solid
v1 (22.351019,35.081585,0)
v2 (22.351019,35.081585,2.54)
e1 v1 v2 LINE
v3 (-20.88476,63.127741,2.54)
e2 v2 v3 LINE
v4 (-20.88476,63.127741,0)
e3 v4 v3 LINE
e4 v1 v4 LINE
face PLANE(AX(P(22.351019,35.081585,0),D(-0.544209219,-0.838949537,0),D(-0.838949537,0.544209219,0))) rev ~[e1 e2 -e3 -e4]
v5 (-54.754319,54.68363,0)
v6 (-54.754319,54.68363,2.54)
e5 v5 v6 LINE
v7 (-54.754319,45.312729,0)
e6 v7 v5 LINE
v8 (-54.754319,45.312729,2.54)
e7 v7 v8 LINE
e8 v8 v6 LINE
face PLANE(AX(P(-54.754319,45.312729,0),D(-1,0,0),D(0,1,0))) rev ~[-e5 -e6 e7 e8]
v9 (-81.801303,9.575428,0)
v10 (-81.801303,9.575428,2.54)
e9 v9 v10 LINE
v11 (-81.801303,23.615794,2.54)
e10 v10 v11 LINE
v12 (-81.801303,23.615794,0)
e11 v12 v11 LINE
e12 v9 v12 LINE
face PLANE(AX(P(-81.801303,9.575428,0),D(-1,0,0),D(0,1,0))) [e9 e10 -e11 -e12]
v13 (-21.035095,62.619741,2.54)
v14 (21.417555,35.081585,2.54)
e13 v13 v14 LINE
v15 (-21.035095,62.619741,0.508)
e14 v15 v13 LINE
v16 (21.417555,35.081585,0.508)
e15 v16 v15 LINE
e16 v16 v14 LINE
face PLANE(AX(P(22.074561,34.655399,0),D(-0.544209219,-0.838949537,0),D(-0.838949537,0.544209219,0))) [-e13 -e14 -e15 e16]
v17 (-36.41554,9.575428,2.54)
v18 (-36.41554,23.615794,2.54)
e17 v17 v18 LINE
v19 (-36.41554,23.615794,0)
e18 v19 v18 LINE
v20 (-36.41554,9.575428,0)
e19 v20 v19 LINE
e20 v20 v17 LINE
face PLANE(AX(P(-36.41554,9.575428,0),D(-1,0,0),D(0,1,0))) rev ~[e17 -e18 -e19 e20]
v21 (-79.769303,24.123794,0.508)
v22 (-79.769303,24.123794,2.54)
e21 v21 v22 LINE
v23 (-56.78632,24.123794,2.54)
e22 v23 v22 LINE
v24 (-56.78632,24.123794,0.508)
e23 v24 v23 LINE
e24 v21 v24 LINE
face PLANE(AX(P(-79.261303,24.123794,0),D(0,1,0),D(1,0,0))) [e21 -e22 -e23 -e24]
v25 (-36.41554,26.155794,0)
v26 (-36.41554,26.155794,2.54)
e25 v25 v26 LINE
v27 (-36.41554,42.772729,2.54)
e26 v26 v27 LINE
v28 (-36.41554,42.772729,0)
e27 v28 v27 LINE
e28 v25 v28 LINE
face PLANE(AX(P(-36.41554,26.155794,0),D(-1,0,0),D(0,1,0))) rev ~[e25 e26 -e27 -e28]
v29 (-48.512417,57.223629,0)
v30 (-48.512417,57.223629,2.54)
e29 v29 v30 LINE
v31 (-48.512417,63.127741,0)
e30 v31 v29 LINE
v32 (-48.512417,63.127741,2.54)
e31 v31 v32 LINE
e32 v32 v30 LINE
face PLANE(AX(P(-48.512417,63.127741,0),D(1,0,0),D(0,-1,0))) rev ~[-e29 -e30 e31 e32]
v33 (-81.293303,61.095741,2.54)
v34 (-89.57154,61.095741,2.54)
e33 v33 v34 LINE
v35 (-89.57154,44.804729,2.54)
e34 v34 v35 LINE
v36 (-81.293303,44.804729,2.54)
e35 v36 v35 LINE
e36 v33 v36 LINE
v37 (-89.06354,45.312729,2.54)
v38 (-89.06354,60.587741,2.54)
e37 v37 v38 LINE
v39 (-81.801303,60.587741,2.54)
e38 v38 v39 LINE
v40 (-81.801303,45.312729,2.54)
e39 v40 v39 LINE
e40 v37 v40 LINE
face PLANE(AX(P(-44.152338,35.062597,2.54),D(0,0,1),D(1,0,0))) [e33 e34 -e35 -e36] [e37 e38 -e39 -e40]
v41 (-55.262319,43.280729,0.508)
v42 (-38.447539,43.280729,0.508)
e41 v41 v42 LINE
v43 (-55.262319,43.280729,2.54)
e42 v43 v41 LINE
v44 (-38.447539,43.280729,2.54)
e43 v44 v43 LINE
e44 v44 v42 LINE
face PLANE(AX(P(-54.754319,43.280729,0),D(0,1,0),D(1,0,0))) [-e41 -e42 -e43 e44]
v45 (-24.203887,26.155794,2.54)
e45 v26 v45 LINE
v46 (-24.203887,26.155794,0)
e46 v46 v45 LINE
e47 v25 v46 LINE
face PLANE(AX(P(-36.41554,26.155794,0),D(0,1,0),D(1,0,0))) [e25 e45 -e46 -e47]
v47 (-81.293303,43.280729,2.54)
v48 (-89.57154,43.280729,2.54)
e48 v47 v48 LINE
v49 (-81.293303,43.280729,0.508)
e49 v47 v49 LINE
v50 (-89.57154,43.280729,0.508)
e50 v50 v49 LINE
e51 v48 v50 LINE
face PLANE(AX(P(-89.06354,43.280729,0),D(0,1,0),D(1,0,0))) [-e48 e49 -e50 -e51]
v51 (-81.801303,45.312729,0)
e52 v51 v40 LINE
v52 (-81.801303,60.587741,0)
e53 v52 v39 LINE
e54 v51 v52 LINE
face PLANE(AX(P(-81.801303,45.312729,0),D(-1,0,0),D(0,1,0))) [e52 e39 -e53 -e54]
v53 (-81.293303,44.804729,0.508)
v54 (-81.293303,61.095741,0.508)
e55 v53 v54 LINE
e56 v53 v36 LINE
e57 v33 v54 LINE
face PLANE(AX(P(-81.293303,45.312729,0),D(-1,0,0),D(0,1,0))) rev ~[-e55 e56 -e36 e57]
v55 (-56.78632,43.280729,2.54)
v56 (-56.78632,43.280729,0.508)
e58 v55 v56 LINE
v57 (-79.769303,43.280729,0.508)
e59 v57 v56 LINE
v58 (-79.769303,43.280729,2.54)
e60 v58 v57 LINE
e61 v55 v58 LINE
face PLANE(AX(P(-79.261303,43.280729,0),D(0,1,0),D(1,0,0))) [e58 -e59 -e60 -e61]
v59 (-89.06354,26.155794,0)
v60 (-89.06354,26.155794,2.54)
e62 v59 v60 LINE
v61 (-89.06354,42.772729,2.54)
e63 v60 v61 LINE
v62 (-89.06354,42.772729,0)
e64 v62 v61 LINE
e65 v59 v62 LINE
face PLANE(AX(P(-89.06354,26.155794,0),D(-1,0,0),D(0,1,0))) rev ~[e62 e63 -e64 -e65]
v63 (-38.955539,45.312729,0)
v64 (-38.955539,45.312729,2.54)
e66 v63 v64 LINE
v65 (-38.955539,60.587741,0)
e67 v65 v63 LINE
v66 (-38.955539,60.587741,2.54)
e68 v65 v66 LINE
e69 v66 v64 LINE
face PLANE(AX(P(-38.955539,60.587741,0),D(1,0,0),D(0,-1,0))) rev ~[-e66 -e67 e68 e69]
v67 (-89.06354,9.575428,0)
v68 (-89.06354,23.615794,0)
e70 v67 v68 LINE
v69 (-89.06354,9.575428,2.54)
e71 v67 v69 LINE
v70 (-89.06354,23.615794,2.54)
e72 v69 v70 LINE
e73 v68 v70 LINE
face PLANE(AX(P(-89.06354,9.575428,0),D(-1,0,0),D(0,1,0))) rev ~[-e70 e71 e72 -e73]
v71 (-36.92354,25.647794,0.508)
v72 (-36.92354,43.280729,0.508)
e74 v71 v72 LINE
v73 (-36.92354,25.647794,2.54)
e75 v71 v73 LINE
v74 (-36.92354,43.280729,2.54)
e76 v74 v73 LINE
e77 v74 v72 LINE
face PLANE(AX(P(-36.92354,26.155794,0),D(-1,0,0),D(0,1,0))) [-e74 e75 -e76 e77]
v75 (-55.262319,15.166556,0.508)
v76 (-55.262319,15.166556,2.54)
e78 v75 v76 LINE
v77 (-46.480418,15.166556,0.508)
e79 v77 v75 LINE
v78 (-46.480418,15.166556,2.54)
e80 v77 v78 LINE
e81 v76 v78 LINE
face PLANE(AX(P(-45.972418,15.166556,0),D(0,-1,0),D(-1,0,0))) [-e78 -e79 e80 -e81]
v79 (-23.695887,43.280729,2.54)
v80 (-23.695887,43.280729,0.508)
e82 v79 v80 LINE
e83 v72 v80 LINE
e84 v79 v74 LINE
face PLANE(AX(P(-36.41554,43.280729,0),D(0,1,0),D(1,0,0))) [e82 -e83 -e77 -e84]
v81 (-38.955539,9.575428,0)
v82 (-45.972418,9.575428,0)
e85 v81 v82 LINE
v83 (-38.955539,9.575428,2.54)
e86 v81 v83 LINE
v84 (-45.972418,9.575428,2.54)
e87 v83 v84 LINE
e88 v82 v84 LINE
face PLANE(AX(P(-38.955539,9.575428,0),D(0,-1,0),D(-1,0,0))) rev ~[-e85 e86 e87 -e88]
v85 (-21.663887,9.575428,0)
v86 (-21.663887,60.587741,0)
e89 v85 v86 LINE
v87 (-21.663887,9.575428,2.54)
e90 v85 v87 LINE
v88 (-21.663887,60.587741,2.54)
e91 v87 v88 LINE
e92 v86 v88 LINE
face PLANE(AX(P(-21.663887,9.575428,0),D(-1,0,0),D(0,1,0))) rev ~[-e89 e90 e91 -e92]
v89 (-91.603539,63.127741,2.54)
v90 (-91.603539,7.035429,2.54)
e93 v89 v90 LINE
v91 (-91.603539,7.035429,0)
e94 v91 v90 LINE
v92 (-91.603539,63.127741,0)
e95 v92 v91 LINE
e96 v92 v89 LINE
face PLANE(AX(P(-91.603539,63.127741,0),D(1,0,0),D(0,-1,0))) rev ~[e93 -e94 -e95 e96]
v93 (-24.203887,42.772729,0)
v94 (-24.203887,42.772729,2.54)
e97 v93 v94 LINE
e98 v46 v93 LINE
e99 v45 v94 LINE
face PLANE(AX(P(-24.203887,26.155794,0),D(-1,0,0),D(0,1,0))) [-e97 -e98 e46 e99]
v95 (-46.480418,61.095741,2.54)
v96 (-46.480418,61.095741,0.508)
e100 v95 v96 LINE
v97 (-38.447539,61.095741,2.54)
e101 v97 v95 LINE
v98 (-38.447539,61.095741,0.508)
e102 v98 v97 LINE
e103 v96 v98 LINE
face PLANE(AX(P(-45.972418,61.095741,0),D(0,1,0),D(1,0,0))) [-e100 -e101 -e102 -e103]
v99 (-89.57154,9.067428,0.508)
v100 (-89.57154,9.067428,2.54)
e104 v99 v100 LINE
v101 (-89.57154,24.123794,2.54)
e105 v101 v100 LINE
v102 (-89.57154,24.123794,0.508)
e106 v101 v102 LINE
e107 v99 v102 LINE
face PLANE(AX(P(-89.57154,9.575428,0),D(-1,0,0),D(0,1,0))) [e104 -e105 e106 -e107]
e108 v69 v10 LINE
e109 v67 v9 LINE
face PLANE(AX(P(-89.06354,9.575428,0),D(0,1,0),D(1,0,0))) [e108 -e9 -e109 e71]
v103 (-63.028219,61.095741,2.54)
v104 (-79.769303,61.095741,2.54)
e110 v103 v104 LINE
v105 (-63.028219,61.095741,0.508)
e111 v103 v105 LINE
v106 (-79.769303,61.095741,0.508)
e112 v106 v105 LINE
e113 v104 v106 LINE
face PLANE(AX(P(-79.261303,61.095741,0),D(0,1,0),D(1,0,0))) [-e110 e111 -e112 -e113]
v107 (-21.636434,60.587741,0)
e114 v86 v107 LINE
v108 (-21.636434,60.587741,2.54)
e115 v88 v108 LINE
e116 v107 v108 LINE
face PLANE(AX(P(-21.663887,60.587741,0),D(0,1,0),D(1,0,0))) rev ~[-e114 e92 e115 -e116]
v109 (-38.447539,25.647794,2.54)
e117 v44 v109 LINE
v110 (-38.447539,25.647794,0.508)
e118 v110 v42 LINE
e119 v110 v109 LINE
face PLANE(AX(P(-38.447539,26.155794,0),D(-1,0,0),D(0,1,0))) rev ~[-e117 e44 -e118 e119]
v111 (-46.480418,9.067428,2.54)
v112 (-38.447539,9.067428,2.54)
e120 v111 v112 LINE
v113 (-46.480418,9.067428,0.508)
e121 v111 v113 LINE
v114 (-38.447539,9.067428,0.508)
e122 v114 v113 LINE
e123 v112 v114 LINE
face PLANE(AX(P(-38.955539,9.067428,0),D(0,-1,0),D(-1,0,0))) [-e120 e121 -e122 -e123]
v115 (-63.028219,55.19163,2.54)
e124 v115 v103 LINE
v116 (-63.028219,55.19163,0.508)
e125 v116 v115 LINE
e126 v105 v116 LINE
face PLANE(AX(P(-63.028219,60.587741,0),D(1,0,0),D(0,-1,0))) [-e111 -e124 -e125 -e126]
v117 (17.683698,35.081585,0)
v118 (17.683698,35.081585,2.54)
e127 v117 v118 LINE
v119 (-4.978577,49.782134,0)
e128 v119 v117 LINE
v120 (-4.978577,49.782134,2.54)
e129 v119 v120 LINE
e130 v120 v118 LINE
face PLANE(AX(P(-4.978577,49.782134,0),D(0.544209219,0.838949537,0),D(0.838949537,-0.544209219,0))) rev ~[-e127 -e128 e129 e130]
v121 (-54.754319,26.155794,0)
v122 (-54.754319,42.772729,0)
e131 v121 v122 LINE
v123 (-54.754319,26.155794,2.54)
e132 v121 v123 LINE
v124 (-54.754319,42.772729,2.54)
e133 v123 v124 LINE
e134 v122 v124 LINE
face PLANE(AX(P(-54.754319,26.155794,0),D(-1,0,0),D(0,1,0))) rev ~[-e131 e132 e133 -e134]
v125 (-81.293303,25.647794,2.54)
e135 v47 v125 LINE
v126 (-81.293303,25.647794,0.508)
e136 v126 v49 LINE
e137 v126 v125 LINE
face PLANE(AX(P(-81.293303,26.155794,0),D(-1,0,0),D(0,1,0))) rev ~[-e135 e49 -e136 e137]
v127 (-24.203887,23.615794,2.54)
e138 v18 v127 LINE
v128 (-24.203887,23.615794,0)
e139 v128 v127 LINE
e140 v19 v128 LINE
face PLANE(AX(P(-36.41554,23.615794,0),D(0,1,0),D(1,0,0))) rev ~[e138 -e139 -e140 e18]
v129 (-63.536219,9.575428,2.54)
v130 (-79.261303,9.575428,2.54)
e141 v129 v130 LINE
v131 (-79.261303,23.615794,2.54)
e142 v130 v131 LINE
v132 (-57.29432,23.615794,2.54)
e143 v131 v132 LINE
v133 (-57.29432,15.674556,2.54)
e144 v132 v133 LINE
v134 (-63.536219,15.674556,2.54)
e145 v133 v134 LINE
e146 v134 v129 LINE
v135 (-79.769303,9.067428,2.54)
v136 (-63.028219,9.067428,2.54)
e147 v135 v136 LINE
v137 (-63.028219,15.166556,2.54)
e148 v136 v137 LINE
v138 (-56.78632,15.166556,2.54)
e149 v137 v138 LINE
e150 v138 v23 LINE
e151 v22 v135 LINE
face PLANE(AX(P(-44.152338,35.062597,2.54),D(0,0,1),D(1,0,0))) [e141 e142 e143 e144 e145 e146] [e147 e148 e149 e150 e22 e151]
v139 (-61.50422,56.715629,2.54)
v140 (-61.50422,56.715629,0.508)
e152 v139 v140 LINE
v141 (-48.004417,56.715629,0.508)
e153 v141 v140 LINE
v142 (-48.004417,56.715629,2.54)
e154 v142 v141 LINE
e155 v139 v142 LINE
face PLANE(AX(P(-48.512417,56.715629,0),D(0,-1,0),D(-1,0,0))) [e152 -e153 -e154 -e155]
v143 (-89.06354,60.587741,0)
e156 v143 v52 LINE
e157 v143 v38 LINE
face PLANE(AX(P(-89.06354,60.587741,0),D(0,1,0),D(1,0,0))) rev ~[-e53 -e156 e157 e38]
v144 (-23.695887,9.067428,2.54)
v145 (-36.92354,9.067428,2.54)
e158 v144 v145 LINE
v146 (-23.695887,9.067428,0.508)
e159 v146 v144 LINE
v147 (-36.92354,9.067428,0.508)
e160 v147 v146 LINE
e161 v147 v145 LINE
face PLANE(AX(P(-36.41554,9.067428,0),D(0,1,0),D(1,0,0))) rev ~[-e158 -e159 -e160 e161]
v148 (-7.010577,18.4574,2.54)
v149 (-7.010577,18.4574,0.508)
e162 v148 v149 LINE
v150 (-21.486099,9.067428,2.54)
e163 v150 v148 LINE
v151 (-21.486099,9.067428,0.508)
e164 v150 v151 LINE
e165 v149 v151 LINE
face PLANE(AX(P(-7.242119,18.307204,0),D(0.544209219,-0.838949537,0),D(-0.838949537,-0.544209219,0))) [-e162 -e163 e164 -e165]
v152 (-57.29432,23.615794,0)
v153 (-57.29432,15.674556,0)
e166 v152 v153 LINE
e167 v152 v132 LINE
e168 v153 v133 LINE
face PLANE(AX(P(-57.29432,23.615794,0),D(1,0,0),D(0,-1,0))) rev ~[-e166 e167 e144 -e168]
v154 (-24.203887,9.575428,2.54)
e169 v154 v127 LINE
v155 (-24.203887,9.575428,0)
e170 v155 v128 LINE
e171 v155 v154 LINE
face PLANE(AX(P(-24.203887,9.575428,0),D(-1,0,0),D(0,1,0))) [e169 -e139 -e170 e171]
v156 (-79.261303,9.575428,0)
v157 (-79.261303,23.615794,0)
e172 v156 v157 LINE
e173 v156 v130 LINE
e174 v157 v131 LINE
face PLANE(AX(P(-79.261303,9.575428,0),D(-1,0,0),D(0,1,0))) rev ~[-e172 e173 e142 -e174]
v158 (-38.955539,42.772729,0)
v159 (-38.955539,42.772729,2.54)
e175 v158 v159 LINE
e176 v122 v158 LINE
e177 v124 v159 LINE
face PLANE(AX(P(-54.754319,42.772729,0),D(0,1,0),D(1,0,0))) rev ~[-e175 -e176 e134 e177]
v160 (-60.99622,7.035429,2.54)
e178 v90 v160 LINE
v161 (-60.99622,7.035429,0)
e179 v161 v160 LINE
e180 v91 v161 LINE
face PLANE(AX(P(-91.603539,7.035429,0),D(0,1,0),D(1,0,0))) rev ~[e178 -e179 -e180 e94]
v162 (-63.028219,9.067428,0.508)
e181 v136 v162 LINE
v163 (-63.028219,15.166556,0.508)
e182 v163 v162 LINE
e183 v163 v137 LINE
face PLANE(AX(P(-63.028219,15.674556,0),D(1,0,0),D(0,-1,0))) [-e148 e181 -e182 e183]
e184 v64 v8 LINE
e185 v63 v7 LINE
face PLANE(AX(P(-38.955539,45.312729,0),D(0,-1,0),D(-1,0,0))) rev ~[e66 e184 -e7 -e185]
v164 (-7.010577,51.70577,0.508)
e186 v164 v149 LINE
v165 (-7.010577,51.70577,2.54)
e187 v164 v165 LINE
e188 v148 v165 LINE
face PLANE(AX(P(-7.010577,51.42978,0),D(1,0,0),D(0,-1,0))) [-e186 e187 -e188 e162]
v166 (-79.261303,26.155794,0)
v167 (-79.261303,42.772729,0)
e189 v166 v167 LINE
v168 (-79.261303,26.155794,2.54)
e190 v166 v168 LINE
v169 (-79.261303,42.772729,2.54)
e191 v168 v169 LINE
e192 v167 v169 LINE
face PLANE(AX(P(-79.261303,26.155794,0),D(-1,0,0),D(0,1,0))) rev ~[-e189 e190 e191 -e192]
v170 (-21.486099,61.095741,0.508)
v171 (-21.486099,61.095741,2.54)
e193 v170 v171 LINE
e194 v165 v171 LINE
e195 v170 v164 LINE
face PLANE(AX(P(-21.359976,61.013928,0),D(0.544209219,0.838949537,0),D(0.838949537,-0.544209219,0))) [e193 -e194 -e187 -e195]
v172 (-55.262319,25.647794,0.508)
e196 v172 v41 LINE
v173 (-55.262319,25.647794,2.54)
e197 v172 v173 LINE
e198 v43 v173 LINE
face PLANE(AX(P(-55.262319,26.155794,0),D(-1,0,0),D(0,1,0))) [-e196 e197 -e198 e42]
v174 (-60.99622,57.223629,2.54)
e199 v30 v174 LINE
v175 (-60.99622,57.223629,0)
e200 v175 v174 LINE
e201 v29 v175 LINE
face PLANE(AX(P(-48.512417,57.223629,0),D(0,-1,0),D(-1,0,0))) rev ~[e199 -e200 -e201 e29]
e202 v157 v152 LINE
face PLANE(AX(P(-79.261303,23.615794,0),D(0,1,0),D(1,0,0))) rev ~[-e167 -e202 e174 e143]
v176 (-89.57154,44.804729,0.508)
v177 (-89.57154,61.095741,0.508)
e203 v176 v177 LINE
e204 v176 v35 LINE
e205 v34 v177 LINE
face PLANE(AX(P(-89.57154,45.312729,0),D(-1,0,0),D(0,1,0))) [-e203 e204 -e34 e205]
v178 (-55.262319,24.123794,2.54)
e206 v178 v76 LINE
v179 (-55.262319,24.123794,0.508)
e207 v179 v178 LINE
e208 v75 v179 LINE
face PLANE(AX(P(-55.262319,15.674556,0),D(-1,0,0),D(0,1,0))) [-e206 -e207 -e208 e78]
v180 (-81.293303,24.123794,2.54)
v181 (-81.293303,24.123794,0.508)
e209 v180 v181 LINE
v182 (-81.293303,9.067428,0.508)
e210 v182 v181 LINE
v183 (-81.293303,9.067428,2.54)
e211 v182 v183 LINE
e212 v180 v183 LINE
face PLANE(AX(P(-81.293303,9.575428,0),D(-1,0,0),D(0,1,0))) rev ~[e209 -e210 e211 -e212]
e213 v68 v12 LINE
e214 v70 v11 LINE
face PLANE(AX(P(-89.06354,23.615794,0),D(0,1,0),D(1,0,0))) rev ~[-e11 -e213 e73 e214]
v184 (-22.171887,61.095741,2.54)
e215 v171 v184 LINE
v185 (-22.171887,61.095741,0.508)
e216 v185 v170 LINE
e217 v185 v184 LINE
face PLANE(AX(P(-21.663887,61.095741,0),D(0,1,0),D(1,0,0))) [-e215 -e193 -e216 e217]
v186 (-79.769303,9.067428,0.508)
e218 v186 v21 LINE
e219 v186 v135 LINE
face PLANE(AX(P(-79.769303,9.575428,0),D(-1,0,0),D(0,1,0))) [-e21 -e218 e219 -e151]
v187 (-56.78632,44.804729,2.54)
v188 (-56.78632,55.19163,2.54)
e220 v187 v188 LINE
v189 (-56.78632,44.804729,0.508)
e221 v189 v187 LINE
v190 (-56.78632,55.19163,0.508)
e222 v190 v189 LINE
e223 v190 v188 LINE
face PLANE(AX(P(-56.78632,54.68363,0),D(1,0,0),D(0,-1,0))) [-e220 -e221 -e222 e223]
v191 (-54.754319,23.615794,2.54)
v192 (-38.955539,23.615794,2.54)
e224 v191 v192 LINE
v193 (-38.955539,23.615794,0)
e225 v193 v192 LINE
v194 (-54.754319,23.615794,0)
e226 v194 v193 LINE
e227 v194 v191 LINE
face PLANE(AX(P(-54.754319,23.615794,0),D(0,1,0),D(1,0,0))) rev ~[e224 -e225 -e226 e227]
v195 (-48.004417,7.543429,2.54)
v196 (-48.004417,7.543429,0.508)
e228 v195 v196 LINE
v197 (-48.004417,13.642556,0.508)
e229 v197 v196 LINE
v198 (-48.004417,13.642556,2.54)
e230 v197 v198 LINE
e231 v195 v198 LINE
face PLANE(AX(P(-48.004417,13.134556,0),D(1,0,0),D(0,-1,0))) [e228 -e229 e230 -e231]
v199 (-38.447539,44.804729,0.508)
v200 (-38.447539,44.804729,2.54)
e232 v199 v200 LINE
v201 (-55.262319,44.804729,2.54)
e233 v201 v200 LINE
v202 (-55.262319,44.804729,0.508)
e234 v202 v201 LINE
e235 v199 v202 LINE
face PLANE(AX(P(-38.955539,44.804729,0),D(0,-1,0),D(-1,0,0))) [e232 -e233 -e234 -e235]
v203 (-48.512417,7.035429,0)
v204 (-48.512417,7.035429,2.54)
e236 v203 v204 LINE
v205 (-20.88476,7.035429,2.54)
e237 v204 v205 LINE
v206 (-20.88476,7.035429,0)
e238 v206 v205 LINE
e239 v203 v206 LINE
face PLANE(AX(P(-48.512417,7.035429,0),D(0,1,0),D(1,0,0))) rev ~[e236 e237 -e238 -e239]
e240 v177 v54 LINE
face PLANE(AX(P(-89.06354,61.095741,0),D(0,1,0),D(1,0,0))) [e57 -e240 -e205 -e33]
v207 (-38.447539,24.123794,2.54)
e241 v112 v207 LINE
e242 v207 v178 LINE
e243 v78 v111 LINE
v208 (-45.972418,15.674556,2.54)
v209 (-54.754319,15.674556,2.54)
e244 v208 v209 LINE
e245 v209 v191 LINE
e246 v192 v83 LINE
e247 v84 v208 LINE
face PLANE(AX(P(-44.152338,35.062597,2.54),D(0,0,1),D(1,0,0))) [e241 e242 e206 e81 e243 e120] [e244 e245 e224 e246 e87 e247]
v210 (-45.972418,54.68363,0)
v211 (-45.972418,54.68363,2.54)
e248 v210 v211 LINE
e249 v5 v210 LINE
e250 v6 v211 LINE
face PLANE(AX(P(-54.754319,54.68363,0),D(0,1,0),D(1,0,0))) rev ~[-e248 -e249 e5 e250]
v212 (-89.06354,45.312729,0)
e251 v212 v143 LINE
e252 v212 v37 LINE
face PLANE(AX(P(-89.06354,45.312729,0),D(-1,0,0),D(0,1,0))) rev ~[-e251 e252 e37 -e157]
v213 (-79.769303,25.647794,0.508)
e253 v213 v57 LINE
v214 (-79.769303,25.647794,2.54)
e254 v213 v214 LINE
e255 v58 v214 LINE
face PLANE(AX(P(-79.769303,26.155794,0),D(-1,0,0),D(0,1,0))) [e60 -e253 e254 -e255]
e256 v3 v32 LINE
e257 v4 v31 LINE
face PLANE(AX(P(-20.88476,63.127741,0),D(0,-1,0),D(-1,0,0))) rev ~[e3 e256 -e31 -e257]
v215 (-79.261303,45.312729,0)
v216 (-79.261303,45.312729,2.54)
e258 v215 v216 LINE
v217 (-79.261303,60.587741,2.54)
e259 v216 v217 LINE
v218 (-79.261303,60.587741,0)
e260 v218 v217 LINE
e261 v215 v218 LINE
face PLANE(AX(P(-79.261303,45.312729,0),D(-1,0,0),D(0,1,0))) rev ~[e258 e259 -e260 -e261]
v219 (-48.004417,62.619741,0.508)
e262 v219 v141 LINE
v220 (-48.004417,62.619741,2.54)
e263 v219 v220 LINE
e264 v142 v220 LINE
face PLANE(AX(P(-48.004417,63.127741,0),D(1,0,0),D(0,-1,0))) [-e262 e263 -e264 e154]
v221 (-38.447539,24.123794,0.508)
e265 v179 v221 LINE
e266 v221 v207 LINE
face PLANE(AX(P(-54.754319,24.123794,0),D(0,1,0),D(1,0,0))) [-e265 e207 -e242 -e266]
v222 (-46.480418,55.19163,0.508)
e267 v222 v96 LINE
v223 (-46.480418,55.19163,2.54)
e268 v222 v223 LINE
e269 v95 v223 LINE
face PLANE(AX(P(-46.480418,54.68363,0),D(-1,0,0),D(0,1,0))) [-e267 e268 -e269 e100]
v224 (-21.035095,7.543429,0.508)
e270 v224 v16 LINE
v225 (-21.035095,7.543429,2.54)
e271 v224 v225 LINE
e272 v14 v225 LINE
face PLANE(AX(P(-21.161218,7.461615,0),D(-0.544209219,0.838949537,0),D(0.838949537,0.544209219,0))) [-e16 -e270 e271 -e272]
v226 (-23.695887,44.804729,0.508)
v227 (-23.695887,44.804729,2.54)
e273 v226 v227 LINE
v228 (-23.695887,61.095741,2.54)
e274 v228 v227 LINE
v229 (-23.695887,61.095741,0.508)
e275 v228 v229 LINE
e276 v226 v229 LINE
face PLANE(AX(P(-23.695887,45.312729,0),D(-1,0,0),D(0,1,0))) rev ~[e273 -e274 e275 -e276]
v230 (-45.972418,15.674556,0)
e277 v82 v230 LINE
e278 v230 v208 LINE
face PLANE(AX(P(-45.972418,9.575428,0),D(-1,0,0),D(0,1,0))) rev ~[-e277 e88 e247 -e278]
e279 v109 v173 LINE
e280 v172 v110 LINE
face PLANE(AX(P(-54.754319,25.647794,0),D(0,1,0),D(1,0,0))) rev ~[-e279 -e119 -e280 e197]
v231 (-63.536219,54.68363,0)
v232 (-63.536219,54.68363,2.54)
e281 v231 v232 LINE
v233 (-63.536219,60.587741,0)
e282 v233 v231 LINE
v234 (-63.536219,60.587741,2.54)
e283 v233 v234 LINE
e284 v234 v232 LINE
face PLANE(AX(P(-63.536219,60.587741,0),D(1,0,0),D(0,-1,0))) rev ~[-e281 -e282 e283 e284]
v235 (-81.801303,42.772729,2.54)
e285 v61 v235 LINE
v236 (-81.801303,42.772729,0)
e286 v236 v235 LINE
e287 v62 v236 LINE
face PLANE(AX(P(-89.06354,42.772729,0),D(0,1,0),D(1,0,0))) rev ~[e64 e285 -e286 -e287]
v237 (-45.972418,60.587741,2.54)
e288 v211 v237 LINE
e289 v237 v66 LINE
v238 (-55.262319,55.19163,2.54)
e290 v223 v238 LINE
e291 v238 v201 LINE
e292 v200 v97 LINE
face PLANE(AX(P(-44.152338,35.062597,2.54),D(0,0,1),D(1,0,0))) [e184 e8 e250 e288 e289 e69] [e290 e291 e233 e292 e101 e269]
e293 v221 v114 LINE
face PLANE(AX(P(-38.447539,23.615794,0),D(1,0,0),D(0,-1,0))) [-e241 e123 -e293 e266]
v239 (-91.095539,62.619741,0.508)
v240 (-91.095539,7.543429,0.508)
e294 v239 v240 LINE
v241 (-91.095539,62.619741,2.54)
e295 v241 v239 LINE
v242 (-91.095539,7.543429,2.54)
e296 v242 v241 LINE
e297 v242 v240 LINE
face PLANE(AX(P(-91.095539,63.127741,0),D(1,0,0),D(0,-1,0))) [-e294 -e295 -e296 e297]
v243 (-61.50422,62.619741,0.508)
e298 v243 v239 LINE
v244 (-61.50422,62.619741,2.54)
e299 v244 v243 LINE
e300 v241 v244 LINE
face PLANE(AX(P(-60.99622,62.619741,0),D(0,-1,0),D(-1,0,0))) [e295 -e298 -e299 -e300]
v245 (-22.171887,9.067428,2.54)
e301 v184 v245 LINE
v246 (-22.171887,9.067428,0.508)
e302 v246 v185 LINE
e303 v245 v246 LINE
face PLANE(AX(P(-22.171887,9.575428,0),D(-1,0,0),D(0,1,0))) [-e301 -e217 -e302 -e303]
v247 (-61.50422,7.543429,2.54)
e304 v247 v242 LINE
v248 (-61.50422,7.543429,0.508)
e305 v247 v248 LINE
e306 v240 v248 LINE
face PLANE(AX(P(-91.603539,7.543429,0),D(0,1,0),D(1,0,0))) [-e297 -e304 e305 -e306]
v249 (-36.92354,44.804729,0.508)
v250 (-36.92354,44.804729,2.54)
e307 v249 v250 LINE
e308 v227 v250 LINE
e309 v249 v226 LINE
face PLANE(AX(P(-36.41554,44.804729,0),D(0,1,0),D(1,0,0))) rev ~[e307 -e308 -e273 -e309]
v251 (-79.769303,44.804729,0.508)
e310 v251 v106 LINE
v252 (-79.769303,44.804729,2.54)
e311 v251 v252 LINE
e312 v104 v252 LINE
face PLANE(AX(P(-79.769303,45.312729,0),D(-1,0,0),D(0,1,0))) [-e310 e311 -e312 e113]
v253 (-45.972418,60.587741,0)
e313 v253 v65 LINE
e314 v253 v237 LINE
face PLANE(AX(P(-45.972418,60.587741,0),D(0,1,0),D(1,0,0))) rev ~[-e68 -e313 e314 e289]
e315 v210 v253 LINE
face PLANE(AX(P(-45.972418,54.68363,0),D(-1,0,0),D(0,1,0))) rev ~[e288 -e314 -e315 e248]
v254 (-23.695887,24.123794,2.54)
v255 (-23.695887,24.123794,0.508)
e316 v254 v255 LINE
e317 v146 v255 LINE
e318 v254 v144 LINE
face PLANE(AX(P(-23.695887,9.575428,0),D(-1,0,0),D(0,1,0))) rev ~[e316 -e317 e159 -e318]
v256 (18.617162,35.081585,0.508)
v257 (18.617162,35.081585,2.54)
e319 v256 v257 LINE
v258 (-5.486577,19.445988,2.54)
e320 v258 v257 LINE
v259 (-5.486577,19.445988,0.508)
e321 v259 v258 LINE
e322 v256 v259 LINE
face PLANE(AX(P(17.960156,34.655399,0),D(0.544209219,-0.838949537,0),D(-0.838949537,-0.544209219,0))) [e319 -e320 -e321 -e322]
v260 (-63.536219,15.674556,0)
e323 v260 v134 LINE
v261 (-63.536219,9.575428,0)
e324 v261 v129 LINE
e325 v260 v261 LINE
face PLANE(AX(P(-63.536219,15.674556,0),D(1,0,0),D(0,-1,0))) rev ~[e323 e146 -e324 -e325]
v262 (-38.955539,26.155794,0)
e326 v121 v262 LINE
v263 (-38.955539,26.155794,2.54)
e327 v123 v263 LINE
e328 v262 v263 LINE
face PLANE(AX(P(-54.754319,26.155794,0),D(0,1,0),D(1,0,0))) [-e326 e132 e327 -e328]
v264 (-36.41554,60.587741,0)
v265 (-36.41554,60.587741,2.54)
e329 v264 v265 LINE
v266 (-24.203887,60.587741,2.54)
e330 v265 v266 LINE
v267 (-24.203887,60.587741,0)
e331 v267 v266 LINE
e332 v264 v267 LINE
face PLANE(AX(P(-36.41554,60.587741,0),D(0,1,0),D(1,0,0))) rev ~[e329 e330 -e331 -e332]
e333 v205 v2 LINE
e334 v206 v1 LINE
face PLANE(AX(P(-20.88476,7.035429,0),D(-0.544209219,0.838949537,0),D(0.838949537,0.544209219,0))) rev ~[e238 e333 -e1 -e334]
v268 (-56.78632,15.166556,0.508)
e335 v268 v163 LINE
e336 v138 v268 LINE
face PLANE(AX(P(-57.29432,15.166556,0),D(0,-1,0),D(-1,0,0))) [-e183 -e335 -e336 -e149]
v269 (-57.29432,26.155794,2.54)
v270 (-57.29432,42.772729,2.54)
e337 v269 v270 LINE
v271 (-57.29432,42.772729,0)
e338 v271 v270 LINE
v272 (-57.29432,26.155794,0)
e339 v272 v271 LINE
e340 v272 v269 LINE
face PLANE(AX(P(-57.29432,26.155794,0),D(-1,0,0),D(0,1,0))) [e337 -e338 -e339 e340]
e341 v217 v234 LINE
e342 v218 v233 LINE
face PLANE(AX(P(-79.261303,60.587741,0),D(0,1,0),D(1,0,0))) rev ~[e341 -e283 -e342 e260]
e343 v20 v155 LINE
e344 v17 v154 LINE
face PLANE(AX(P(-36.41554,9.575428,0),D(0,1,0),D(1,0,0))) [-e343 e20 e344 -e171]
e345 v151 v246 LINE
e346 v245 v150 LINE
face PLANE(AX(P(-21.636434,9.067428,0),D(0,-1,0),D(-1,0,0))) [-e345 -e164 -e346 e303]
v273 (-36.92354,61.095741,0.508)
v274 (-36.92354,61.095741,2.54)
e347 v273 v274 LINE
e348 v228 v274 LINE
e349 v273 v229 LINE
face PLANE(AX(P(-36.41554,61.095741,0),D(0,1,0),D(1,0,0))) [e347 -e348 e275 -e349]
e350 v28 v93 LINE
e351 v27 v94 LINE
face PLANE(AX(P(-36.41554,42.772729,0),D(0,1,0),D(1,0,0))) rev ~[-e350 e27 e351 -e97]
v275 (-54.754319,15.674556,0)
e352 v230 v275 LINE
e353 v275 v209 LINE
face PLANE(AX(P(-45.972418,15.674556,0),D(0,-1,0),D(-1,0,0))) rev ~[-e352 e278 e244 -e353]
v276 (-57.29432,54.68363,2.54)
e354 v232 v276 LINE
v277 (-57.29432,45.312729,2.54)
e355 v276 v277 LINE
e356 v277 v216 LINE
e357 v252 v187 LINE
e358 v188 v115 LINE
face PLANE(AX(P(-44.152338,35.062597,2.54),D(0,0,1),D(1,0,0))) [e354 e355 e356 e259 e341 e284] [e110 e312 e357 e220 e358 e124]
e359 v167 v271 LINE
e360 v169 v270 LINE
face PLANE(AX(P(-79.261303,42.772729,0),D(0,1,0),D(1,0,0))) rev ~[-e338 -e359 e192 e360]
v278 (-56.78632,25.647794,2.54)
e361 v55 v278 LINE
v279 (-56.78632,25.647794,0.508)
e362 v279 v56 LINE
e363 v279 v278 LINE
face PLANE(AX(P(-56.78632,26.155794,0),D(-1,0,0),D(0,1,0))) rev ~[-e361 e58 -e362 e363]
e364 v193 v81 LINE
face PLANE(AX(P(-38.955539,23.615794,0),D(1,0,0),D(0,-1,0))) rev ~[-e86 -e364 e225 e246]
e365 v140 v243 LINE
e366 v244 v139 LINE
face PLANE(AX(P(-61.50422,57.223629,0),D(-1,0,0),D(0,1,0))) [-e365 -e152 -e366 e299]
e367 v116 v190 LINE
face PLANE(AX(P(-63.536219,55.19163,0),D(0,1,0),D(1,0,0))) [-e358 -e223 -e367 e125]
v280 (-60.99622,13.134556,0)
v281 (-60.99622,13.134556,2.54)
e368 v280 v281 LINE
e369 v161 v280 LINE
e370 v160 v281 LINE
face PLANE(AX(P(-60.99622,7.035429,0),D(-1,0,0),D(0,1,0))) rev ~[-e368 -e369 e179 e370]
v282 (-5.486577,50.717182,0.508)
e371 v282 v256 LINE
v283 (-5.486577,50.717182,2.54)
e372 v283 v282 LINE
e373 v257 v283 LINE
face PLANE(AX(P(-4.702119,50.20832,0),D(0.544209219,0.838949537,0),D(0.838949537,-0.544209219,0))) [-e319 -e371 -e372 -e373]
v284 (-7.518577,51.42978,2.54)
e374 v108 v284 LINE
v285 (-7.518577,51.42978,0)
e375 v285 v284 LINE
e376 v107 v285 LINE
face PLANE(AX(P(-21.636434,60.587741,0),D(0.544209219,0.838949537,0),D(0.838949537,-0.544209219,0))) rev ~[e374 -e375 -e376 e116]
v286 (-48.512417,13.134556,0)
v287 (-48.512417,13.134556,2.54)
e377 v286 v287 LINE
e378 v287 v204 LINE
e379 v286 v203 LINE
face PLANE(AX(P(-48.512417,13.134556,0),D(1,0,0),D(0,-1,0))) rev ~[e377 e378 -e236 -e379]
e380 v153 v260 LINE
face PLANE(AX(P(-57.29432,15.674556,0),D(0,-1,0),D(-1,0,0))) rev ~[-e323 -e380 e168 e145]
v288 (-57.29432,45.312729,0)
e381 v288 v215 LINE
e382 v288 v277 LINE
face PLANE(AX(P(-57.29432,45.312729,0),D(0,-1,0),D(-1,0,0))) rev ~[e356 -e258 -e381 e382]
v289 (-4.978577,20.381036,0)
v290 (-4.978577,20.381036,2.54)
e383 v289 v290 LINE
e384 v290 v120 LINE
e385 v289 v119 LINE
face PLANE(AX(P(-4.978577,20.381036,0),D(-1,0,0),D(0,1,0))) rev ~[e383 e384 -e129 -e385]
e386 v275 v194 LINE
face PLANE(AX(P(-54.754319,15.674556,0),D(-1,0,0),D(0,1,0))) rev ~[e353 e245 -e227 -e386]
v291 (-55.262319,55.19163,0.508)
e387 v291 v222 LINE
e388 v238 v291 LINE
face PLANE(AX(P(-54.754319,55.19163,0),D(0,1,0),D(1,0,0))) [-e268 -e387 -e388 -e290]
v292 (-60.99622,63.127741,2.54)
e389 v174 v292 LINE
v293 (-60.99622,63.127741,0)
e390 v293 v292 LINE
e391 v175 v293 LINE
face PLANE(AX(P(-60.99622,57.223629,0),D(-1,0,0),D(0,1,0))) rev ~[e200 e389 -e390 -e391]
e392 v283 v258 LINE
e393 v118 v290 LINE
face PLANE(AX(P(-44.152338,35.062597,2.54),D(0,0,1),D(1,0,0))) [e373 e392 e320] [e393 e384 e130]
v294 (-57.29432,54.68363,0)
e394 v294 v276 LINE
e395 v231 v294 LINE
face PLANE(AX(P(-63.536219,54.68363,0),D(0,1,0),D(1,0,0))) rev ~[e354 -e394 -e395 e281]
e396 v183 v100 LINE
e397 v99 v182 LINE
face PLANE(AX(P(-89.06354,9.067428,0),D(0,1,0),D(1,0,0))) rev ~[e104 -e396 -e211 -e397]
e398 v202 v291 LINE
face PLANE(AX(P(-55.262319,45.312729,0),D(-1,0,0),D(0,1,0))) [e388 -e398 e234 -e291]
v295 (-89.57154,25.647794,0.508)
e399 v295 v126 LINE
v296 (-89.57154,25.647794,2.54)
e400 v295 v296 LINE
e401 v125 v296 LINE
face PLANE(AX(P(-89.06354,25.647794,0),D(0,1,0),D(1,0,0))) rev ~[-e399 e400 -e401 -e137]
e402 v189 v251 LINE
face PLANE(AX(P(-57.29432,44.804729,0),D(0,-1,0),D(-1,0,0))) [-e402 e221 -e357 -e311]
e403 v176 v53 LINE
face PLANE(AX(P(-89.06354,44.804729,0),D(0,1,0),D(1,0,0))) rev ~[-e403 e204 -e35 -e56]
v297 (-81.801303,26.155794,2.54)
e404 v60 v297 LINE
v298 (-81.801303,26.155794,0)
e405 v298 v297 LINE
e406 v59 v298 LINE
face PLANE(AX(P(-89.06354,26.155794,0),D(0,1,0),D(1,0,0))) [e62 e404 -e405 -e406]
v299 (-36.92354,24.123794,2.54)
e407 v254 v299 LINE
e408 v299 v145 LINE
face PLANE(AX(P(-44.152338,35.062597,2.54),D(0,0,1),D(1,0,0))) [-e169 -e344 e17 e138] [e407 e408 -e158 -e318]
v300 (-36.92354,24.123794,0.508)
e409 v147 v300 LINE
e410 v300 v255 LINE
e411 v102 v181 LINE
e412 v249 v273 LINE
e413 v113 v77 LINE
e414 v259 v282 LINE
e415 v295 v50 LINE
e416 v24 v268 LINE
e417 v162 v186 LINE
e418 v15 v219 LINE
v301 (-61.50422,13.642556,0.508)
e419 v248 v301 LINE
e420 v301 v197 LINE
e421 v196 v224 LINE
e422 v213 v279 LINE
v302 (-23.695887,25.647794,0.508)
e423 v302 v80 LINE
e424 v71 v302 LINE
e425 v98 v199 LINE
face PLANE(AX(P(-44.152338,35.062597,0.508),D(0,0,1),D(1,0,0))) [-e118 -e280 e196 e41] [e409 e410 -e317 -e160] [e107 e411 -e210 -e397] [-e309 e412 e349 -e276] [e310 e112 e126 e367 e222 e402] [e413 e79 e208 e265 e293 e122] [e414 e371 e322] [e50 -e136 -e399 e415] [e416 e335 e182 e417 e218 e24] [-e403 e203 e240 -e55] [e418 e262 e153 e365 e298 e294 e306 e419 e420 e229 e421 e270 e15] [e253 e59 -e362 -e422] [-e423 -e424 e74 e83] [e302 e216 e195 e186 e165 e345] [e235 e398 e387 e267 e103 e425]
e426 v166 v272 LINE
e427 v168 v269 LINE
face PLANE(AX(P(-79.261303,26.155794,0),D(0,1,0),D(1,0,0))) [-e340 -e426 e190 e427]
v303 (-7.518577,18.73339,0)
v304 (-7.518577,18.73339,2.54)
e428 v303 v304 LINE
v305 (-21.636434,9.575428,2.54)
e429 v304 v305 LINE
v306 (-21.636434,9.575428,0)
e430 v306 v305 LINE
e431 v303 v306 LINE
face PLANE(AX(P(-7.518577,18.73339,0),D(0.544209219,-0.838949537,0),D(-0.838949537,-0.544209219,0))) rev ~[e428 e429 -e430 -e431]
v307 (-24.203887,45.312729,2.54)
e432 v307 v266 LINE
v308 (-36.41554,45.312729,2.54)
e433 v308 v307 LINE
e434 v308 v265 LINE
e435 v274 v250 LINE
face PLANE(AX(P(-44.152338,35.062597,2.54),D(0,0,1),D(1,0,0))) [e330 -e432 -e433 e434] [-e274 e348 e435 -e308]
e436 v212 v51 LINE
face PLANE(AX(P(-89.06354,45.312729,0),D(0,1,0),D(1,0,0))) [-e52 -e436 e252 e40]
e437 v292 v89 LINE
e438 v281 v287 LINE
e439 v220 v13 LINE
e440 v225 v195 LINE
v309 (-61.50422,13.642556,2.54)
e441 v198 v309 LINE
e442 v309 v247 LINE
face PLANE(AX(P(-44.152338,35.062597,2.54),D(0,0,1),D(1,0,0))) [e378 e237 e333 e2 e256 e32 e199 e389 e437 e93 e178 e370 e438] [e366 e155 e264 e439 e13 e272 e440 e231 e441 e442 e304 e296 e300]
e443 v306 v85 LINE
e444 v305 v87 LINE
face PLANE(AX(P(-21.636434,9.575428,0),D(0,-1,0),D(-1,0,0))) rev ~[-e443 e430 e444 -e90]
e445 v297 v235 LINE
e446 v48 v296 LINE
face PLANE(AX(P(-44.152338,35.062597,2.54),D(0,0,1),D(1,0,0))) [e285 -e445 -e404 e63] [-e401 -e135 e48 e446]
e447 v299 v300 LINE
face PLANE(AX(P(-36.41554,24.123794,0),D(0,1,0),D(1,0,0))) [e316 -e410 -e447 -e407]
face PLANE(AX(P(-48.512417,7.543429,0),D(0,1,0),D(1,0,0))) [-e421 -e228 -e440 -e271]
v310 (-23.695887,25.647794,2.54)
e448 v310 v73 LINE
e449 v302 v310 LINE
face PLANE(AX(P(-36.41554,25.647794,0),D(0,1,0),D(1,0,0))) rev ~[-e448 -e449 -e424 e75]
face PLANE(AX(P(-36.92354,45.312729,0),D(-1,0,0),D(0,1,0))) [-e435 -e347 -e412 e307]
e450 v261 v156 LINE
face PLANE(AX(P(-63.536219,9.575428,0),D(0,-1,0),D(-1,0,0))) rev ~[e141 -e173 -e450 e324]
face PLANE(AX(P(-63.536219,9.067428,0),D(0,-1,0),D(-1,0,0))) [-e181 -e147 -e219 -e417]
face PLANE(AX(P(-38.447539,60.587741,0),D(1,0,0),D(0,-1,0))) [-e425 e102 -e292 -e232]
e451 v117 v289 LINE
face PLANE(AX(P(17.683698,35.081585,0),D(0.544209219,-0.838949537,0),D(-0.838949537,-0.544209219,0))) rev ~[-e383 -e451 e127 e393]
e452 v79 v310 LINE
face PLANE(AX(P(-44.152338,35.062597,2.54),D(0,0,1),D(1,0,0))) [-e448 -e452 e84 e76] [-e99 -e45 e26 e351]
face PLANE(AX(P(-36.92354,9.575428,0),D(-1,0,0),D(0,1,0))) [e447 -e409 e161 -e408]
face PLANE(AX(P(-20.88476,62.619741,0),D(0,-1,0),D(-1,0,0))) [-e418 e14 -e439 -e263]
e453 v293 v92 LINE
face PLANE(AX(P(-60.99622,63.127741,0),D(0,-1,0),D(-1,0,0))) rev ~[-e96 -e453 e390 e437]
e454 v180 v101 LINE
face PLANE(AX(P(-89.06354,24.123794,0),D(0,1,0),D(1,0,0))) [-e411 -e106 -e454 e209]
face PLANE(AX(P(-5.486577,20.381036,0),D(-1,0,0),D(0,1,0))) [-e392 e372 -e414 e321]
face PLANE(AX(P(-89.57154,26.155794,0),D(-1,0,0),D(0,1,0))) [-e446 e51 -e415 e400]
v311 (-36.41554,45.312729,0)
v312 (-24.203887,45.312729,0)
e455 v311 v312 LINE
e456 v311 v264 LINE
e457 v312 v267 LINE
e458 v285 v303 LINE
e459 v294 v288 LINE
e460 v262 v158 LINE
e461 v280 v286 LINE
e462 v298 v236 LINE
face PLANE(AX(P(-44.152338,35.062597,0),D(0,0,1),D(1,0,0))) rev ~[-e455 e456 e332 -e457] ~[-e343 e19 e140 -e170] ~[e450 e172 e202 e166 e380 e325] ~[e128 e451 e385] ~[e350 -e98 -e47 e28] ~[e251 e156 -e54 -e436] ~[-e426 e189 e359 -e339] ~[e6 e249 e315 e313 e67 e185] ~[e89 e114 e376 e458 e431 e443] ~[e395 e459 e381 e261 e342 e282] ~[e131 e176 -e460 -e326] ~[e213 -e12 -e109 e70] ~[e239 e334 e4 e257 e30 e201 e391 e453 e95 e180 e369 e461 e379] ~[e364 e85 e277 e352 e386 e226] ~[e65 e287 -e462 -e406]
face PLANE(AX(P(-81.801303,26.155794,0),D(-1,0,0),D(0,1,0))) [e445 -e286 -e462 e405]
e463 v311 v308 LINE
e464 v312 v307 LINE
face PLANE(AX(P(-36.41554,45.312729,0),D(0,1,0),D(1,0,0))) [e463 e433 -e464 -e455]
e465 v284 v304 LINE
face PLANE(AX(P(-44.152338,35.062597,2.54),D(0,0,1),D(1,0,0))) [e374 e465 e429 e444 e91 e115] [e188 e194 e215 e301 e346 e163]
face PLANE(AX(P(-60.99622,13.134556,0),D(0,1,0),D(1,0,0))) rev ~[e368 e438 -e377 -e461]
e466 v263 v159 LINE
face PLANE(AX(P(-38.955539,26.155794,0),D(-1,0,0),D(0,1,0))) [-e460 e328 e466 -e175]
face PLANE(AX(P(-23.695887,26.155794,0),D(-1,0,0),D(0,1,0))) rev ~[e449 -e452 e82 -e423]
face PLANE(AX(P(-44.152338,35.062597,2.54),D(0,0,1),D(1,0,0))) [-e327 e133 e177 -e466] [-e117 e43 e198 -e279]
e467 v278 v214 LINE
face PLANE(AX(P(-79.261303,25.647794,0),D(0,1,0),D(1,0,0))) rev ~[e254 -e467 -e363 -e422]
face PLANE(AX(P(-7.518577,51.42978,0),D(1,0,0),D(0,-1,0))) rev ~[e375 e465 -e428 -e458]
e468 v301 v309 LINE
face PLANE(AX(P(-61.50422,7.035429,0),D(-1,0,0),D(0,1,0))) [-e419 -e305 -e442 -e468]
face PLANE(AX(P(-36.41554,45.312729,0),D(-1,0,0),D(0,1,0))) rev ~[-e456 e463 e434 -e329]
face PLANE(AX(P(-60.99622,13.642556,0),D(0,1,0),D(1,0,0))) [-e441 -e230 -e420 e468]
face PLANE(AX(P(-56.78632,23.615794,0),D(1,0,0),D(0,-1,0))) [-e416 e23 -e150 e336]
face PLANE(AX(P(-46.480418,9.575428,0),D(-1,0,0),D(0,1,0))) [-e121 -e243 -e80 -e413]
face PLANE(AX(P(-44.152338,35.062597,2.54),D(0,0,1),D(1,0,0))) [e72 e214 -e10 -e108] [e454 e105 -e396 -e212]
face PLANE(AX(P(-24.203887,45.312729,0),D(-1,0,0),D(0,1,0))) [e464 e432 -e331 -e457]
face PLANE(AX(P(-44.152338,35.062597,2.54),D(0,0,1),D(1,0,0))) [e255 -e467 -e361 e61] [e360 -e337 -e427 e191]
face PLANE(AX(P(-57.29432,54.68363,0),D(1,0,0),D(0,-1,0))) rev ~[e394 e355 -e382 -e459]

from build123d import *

# Parameters (mm, degrees)
F0_W     = 7.26223737
F0_H     = 14.0403658152
F0_H_2   = 16.6169349104
F0_W_2   = 21.9669826329
F0_W_3   = 15.7987792045
F0_W_4   = 12.2116522557
F0_H_3   = 15.2750127017
F1_DEPTH = 2.54
F2_T     = -0.508


with BuildPart() as f1:
    # F0 (on Top) → F1 (new body)
    with BuildSketch(Plane.XY):
        Polygon((-48.5124173612, 7.03542912), (-20.8847596319, 7.03542912), (22.3510192425, 35.0815849379), (-20.8847596319, 63.1277407557), (-48.5124173612, 63.1277407557), (-48.5124173612, 57.2236290348), (-60.9962199777, 57.2236290348), (-60.9962199777, 63.1277407557), (-91.6035394222, 63.1277407557), (-91.6035394222, 7.03542912), (-60.9962199777, 7.03542912), (-60.9962199777, 13.134556353), (-48.5124173612, 13.134556353), align=None)
        with Locations((-85.432421416, 16.5956113487)):
            Rectangle(F0_W, F0_H, mode=Mode.SUBTRACT)
        Polygon((-57.2943203151, 15.6745556742), (-63.5362192988, 15.6745556742), (-63.5362192988, 9.5754284412), (-79.261302948, 9.5754284412), (-79.261302948, 23.6157942563), (-57.2943203151, 23.6157942563), align=None, mode=Mode.SUBTRACT)
        Polygon((-38.955539465, 9.5754284412), (-45.97241804, 9.5754284412), (-45.97241804, 15.6745556742), (-54.7543186694, 15.6745556742), (-54.7543186694, 23.6157942563), (-38.955539465, 23.6157942563), align=None, mode=Mode.SUBTRACT)
        with Locations((-85.432421416, 34.4642614946)):
            Rectangle(F0_W, F0_H_2, mode=Mode.SUBTRACT)
        with Locations((-68.2778116316, 34.4642614946)):
            Rectangle(F0_W_2, F0_H_2, mode=Mode.SUBTRACT)
        with Locations((-46.8549290672, 34.4642614946)):
            Rectangle(F0_W_3, F0_H_2, mode=Mode.SUBTRACT)
        with Locations((-30.3097135541, 16.5956113487)):
            Rectangle(F0_W_4, F0_H, mode=Mode.SUBTRACT)
        with Locations((-30.3097135541, 34.4642614946)):
            Rectangle(F0_W_4, F0_H_2, mode=Mode.SUBTRACT)
        Polygon((-7.5185770554, 18.7333902767), (-21.6364338994, 9.5754284412), (-21.6638874263, 9.5754284412), (-21.6638874263, 23.6157942563), (-21.6638874263, 26.1557940394), (-21.6638874263, 42.7727289498), (-21.6638874263, 45.3127287328), (-21.6638874263, 60.5877414346), (-21.6364338994, 60.5877414346), (-7.5185770554, 51.429779599), align=None, mode=Mode.SUBTRACT)
        with Locations((-85.432421416, 52.9502350837)):
            Rectangle(F0_W, F0_H_3, mode=Mode.SUBTRACT)
        Polygon((-79.261302948, 60.5877414346), (-63.5362192988, 60.5877414346), (-63.5362192988, 54.6836297136), (-57.2943203151, 54.6836297136), (-57.2943203151, 45.3127287328), (-79.261302948, 45.3127287328), align=None, mode=Mode.SUBTRACT)
        Polygon((-54.7543186694, 54.6836297136), (-45.97241804, 54.6836297136), (-45.97241804, 60.5877414346), (-38.955539465, 60.5877414346), (-38.955539465, 45.3127287328), (-54.7543186694, 45.3127287328), align=None, mode=Mode.SUBTRACT)
        Polygon((-4.9785770554, 49.7821341158), (17.6836978644, 35.0815849379), (-4.9785770554, 20.38103576), align=None, mode=Mode.SUBTRACT)
        with Locations((-30.3097135541, 52.9502350837)):
            Rectangle(F0_W_4, F0_H_3, mode=Mode.SUBTRACT)
    extrude(amount=F1_DEPTH)

    # F2
    f2_openings = [f1.faces().sort_by_distance(p)[0] for p in [
        (-90.333422, 35.081585, 2.54),
    ]]
    offset(amount=F2_T, openings=f2_openings, kind=Kind.INTERSECTION)


solid = f1.part
